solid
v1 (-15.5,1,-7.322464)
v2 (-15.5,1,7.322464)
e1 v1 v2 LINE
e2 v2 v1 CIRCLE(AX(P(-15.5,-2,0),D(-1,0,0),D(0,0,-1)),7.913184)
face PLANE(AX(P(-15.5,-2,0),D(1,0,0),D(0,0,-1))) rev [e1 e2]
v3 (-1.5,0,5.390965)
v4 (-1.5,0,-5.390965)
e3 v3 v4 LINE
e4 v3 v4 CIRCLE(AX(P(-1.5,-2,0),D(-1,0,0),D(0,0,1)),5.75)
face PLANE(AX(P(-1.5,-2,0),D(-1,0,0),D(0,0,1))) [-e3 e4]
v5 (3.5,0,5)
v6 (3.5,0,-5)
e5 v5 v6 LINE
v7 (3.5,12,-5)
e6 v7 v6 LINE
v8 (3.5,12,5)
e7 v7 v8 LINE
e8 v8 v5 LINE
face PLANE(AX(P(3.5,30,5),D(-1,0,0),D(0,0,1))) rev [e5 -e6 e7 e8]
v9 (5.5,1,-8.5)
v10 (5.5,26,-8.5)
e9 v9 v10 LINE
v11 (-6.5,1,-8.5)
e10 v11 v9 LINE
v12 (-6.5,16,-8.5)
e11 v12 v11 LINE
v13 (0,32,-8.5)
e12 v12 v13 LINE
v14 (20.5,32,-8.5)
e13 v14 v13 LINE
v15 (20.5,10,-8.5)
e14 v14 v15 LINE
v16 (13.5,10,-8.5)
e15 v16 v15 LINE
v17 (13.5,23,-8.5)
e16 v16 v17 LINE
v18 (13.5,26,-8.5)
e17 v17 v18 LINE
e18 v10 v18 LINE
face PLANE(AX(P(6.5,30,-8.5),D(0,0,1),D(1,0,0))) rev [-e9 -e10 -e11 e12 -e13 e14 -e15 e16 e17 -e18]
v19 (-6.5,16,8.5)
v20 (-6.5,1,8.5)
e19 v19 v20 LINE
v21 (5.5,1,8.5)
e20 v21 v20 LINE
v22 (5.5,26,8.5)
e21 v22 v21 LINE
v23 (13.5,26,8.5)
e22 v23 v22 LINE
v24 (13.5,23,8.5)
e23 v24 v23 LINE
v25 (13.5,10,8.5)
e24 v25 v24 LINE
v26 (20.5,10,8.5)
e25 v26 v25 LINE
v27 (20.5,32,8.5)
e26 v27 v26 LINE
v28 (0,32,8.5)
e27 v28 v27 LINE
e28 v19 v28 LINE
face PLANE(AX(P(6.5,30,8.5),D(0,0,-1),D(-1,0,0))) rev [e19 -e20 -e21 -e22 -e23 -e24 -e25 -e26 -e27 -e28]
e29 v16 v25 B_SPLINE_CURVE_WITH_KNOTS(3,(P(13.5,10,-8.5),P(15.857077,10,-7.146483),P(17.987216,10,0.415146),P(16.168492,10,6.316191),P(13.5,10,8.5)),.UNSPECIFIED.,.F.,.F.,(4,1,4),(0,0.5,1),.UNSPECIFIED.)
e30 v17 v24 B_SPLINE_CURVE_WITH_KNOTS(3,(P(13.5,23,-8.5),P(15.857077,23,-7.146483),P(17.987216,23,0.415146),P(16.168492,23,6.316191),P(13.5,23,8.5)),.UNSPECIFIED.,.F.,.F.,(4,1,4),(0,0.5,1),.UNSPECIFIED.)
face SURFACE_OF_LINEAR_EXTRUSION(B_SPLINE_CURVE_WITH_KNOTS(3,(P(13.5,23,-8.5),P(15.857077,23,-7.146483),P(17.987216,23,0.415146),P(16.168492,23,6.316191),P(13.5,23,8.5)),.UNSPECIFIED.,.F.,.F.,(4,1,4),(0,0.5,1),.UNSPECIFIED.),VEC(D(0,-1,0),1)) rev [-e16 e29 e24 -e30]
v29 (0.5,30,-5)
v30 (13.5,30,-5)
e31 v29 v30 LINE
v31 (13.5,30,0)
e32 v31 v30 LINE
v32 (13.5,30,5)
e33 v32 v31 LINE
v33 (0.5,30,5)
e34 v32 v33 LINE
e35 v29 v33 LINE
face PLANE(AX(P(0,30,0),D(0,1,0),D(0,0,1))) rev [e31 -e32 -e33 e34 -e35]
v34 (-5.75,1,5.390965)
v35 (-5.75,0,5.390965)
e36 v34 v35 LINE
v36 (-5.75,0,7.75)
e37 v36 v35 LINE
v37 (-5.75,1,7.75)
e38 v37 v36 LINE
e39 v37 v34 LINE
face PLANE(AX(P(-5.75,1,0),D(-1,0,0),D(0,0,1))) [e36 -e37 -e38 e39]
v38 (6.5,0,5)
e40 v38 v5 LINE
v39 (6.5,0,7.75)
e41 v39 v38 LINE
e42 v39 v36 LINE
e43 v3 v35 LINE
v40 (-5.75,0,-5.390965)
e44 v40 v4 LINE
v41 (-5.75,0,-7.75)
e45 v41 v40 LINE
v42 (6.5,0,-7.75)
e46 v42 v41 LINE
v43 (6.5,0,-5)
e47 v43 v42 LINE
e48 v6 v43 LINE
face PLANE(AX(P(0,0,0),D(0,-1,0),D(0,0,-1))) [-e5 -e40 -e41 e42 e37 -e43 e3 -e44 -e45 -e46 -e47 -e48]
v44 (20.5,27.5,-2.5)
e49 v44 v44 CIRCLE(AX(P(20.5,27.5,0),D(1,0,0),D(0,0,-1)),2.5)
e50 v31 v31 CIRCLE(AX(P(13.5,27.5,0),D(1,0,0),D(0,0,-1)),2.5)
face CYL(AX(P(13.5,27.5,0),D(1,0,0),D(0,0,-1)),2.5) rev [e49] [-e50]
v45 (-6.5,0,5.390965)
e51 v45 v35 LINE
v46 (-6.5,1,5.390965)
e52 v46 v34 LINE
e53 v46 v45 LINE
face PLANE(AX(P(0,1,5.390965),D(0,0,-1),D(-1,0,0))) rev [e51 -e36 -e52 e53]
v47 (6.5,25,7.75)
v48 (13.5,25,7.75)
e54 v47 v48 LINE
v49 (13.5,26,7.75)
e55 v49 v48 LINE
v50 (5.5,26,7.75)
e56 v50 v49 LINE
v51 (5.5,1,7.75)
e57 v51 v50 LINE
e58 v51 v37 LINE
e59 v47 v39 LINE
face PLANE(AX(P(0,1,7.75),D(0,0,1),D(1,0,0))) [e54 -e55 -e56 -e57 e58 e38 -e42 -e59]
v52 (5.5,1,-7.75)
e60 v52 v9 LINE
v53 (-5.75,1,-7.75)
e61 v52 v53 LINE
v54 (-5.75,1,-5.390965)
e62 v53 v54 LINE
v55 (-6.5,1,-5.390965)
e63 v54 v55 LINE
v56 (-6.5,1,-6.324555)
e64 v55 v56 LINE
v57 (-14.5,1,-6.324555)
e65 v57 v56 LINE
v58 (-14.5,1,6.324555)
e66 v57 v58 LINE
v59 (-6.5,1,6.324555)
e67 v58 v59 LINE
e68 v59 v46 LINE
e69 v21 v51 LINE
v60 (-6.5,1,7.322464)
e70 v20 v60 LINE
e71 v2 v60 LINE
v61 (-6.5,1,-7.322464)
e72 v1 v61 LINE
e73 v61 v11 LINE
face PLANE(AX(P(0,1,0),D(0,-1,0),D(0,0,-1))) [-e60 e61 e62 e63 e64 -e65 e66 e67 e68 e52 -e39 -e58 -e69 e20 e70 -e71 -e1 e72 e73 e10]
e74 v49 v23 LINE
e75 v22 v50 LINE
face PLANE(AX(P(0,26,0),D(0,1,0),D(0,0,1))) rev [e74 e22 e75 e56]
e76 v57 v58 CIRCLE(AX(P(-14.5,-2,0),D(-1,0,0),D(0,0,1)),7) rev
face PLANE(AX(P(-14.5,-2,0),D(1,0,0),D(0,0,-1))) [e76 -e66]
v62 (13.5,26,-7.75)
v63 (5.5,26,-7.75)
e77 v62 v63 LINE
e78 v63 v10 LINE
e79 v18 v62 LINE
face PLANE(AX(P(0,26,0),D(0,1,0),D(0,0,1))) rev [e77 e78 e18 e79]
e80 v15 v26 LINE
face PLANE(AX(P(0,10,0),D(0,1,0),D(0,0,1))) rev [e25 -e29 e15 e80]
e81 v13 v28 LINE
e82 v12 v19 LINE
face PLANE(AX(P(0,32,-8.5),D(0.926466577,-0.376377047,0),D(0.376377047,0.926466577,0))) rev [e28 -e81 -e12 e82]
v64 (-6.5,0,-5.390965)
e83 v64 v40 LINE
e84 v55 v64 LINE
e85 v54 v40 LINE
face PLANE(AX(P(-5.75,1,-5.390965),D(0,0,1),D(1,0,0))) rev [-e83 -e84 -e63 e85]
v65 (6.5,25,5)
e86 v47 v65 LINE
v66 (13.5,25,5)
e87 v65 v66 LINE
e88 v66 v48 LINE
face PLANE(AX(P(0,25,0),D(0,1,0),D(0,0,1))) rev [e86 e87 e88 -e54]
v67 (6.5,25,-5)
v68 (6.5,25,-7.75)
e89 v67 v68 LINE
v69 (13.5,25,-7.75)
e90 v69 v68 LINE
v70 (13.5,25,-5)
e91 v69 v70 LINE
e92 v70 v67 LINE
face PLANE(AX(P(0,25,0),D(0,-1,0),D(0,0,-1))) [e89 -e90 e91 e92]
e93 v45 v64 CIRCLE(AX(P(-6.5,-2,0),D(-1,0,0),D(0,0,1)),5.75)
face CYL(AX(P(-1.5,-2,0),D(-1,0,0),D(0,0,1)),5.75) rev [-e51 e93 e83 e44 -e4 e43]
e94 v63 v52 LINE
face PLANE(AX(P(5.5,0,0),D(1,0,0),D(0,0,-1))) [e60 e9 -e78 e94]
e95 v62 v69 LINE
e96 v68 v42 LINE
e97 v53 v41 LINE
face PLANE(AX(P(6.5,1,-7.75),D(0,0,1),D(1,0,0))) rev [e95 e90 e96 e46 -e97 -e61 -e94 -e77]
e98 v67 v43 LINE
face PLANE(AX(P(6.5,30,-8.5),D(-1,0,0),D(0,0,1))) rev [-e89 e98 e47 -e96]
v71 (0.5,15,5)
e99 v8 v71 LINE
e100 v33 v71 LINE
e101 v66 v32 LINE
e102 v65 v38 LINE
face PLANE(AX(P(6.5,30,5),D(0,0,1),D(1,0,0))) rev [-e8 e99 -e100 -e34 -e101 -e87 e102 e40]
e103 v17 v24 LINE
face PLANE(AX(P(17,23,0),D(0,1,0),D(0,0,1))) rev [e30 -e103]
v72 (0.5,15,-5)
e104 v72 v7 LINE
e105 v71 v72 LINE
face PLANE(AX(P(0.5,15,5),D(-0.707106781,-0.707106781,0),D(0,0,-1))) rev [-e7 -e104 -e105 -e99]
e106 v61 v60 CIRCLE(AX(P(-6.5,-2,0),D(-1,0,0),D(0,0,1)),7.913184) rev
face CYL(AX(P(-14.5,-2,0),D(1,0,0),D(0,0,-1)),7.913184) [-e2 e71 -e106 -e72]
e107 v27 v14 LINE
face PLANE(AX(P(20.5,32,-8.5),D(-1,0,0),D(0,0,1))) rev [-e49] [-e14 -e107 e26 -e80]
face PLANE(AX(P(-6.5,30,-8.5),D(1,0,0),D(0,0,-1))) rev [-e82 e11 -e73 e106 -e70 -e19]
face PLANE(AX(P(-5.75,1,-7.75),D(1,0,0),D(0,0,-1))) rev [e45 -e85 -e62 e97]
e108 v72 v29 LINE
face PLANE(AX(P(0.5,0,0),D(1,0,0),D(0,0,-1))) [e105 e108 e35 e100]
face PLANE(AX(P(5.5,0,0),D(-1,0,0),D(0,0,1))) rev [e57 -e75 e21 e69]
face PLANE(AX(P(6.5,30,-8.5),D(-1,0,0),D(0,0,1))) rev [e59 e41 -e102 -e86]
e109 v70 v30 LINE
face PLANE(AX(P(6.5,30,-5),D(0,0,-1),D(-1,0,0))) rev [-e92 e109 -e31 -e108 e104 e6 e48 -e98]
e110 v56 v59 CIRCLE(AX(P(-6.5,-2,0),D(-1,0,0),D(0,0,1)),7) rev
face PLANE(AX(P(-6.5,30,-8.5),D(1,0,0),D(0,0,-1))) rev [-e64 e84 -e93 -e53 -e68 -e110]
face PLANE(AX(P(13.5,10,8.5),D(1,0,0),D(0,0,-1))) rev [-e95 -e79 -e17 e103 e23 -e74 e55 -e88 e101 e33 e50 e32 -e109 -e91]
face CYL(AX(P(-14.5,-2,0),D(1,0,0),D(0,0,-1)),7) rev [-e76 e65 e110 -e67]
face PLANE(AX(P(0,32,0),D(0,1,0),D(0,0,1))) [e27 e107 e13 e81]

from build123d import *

# Parameters (mm, degrees)
SKETCH1_W           = 13
SKETCH1_H           = 17
BOSS_EXTRUDE1_DEPTH = 30
SKETCH2_R           = 5.75
CUT_EXTRUDE1_DEPTH  = 5
SKETCH3_W           = 3
SKETCH3_H           = 10
CUT_EXTRUDE2_DEPTH  = 32.851216617
SKETCH4_W           = 27
SKETCH4_H           = 17
BOSS_EXTRUDE2_DEPTH = 2
SKETCH5_W           = 7
SKETCH5_H           = 17
BOSS_EXTRUDE3_DEPTH = 20
SKETCH6_W           = 7
SKETCH6_H           = 3.5
BOSS_EXTRUDE4_DEPTH = 5
SKETCH7_R           = 2.5
CUT_EXTRUDE3_DEPTH  = 7
CUT_EXTRUDE4_DEPTH  = 42.632319176
CUT_EXTRUDE5_DEPTH  = 1
SKETCH11_W          = 0.75
SKETCH11_H          = 24
CUT_EXTRUDE6_DEPTH  = 1
SKETCH12_W          = 8
SKETCH12_H          = 0.75
CUT_EXTRUDE7_DEPTH  = 1
CUT_EXTRUDE8_DEPTH  = 13
SKETCH14_W          = 10
SKETCH14_H          = 15
CUT_EXTRUDE9_DEPTH  = 3
CHAMFER1_SIZE       = 3
BOSS_EXTRUDE5_DEPTH = 8
BOSS_EXTRUDE6_DEPTH = 1


with BuildPart() as part:
    # Sketch1 → Boss-Extrude1 (new body)
    with BuildSketch(Plane(origin=(0, 0, 0), x_dir=(1, 0, 0), z_dir=(0, 1, 0))):
        Rectangle(SKETCH1_W, SKETCH1_H)
    extrude(amount=BOSS_EXTRUDE1_DEPTH)

    # Sketch2 → Cut-Extrude1 (cut)
    with BuildSketch(Plane.ZY.offset(6.5)):
        with Locations((0, -2)):
            Circle(SKETCH2_R)
    extrude(amount=-CUT_EXTRUDE1_DEPTH, mode=Mode.SUBTRACT)

    # Sketch3 → Cut-Extrude2 (cut, through all)
    with BuildSketch(Plane.XZ):
        with Locations((5, 0)):
            Rectangle(SKETCH3_W, SKETCH3_H)
    extrude(amount=-CUT_EXTRUDE2_DEPTH, mode=Mode.SUBTRACT)

    # Sketch4 → Boss-Extrude2 (add)
    with BuildSketch(Plane(origin=(0, 30, 0), x_dir=(1, 0, 0), z_dir=(0, 1, 0))):
        with Locations((7, 0)):
            Rectangle(SKETCH4_W, SKETCH4_H)
    extrude(amount=BOSS_EXTRUDE2_DEPTH)

    # Sketch5 → Boss-Extrude3 (add)
    with BuildSketch(Plane.XZ.offset(-30)):
        with Locations((17, 0)):
            Rectangle(SKETCH5_W, SKETCH5_H)
    extrude(amount=BOSS_EXTRUDE3_DEPTH)

    # Sketch6 → Boss-Extrude4 (add)
    with BuildSketch(Plane.XZ.offset(-30)):
        with Locations((10, 6.75)):
            Rectangle(SKETCH6_W, SKETCH6_H)
        with Locations((10, -6.75)):
            Rectangle(SKETCH6_W, SKETCH6_H)
    extrude(amount=BOSS_EXTRUDE4_DEPTH)

    # Sketch7 → Cut-Extrude3 (cut)
    with BuildSketch(Plane(origin=(20.5, 0, 0), x_dir=(0, 0, -1), z_dir=(1, 0, 0))):
        with Locations((0, 27.5)):
            Circle(SKETCH7_R)
    extrude(amount=-CUT_EXTRUDE3_DEPTH, mode=Mode.SUBTRACT)

    # Sketch9 → Cut-Extrude4 (cut, through all)
    with BuildSketch(Plane.XY.offset(8.5)):
        Polygon((0, 32), (-6.5, 16), (-6.5, 32), align=None)
    extrude(amount=-CUT_EXTRUDE4_DEPTH, mode=Mode.SUBTRACT)

    # Sketch10 → Cut-Extrude5 (cut)
    with BuildSketch(Plane.XZ):
        Polygon((-5.75, 5.390964663), (-5.75, 7.75), (6.5, 7.75), (6.5, 8.5), (-6.5, 8.5), (-6.5, 5.390964663), align=None)
        Polygon((-5.75, -7.75), (-5.75, -5.390964663), (-6.5, -5.390964663), (-6.5, -8.5), (6.5, -8.5), (6.5, -7.75), align=None)
    extrude(amount=-CUT_EXTRUDE5_DEPTH, mode=Mode.SUBTRACT)

    # Sketch11 → Cut-Extrude6 (cut)
    with BuildSketch(Plane(origin=(6.5, 0, 0), x_dir=(0, 0, -1), z_dir=(1, 0, 0))):
        with Locations((-8.125, 13)):
            Rectangle(SKETCH11_W, SKETCH11_H)
        with Locations((8.125, 13)):
            Rectangle(SKETCH11_W, SKETCH11_H)
    extrude(amount=-CUT_EXTRUDE6_DEPTH, mode=Mode.SUBTRACT)

    # Sketch12 → Cut-Extrude7 (cut)
    with BuildSketch(Plane.XZ.offset(-25)):
        with Locations((9.5, -8.125)):
            Rectangle(SKETCH12_W, SKETCH12_H)
        with Locations((9.5, 8.125)):
            Rectangle(SKETCH12_W, SKETCH12_H)
    extrude(amount=-CUT_EXTRUDE7_DEPTH, mode=Mode.SUBTRACT)

    # Sketch13 → Cut-Extrude8 (cut)
    with BuildSketch(Plane.XZ.offset(-10)):
        with BuildLine():
            Line((13.5, -8.5), (13.5, 8.5))
            add(Edge.make_bspline(
                [(13.5, -8.5), (15.857076701, -7.146482538), (17.987215619, 0.415145569), (16.168492061, 6.316191401), (13.5, 8.5)],
                knots=[0, 0, 0, 0, 0.5, 1, 1, 1, 1], degree=3))
        make_face()
    extrude(amount=-CUT_EXTRUDE8_DEPTH, mode=Mode.SUBTRACT)

    # Sketch14 → Cut-Extrude9 (cut)
    with BuildSketch(Plane(origin=(3.5, 0, 0), x_dir=(0, 0, -1), z_dir=(1, 0, 0))):
        with Locations((0, 22.5)):
            Rectangle(SKETCH14_W, SKETCH14_H)
    extrude(amount=-CUT_EXTRUDE9_DEPTH, mode=Mode.SUBTRACT)

    # Chamfer1
    chamfer1_edges = [part.edges().sort_by_distance(p)[0] for p in [
        (3.5, 15, 0),
    ]]
    chamfer(chamfer1_edges, length=CHAMFER1_SIZE - 0.0001)  # a hair under: the kernel refuses the full size

    # Sketch15 → Boss-Extrude5 (add)
    with BuildSketch(Plane.ZY.offset(6.5)):
        with BuildLine():
            Line((-7.322463691, 1), (-6.32455532, 1))
            ThreePointArc((-6.32455532, 1), (0, 5), (6.32455532, 1))
            Line((6.32455532, 1), (7.322463691, 1))
            ThreePointArc((7.322463691, 1), (0, 5.913183588), (-7.322463691, 1))
        make_face()
    extrude(amount=BOSS_EXTRUDE5_DEPTH)

    # Sketch16 → Boss-Extrude6 (add)
    with BuildSketch(Plane.ZY.offset(14.5)):
        with BuildLine():
            Line((-7.322463691, 1), (7.322463691, 1))
            ThreePointArc((7.322463691, 1), (0, 5.913183588), (-7.322463691, 1))
        make_face()
    extrude(amount=BOSS_EXTRUDE6_DEPTH)


solid = part.part
